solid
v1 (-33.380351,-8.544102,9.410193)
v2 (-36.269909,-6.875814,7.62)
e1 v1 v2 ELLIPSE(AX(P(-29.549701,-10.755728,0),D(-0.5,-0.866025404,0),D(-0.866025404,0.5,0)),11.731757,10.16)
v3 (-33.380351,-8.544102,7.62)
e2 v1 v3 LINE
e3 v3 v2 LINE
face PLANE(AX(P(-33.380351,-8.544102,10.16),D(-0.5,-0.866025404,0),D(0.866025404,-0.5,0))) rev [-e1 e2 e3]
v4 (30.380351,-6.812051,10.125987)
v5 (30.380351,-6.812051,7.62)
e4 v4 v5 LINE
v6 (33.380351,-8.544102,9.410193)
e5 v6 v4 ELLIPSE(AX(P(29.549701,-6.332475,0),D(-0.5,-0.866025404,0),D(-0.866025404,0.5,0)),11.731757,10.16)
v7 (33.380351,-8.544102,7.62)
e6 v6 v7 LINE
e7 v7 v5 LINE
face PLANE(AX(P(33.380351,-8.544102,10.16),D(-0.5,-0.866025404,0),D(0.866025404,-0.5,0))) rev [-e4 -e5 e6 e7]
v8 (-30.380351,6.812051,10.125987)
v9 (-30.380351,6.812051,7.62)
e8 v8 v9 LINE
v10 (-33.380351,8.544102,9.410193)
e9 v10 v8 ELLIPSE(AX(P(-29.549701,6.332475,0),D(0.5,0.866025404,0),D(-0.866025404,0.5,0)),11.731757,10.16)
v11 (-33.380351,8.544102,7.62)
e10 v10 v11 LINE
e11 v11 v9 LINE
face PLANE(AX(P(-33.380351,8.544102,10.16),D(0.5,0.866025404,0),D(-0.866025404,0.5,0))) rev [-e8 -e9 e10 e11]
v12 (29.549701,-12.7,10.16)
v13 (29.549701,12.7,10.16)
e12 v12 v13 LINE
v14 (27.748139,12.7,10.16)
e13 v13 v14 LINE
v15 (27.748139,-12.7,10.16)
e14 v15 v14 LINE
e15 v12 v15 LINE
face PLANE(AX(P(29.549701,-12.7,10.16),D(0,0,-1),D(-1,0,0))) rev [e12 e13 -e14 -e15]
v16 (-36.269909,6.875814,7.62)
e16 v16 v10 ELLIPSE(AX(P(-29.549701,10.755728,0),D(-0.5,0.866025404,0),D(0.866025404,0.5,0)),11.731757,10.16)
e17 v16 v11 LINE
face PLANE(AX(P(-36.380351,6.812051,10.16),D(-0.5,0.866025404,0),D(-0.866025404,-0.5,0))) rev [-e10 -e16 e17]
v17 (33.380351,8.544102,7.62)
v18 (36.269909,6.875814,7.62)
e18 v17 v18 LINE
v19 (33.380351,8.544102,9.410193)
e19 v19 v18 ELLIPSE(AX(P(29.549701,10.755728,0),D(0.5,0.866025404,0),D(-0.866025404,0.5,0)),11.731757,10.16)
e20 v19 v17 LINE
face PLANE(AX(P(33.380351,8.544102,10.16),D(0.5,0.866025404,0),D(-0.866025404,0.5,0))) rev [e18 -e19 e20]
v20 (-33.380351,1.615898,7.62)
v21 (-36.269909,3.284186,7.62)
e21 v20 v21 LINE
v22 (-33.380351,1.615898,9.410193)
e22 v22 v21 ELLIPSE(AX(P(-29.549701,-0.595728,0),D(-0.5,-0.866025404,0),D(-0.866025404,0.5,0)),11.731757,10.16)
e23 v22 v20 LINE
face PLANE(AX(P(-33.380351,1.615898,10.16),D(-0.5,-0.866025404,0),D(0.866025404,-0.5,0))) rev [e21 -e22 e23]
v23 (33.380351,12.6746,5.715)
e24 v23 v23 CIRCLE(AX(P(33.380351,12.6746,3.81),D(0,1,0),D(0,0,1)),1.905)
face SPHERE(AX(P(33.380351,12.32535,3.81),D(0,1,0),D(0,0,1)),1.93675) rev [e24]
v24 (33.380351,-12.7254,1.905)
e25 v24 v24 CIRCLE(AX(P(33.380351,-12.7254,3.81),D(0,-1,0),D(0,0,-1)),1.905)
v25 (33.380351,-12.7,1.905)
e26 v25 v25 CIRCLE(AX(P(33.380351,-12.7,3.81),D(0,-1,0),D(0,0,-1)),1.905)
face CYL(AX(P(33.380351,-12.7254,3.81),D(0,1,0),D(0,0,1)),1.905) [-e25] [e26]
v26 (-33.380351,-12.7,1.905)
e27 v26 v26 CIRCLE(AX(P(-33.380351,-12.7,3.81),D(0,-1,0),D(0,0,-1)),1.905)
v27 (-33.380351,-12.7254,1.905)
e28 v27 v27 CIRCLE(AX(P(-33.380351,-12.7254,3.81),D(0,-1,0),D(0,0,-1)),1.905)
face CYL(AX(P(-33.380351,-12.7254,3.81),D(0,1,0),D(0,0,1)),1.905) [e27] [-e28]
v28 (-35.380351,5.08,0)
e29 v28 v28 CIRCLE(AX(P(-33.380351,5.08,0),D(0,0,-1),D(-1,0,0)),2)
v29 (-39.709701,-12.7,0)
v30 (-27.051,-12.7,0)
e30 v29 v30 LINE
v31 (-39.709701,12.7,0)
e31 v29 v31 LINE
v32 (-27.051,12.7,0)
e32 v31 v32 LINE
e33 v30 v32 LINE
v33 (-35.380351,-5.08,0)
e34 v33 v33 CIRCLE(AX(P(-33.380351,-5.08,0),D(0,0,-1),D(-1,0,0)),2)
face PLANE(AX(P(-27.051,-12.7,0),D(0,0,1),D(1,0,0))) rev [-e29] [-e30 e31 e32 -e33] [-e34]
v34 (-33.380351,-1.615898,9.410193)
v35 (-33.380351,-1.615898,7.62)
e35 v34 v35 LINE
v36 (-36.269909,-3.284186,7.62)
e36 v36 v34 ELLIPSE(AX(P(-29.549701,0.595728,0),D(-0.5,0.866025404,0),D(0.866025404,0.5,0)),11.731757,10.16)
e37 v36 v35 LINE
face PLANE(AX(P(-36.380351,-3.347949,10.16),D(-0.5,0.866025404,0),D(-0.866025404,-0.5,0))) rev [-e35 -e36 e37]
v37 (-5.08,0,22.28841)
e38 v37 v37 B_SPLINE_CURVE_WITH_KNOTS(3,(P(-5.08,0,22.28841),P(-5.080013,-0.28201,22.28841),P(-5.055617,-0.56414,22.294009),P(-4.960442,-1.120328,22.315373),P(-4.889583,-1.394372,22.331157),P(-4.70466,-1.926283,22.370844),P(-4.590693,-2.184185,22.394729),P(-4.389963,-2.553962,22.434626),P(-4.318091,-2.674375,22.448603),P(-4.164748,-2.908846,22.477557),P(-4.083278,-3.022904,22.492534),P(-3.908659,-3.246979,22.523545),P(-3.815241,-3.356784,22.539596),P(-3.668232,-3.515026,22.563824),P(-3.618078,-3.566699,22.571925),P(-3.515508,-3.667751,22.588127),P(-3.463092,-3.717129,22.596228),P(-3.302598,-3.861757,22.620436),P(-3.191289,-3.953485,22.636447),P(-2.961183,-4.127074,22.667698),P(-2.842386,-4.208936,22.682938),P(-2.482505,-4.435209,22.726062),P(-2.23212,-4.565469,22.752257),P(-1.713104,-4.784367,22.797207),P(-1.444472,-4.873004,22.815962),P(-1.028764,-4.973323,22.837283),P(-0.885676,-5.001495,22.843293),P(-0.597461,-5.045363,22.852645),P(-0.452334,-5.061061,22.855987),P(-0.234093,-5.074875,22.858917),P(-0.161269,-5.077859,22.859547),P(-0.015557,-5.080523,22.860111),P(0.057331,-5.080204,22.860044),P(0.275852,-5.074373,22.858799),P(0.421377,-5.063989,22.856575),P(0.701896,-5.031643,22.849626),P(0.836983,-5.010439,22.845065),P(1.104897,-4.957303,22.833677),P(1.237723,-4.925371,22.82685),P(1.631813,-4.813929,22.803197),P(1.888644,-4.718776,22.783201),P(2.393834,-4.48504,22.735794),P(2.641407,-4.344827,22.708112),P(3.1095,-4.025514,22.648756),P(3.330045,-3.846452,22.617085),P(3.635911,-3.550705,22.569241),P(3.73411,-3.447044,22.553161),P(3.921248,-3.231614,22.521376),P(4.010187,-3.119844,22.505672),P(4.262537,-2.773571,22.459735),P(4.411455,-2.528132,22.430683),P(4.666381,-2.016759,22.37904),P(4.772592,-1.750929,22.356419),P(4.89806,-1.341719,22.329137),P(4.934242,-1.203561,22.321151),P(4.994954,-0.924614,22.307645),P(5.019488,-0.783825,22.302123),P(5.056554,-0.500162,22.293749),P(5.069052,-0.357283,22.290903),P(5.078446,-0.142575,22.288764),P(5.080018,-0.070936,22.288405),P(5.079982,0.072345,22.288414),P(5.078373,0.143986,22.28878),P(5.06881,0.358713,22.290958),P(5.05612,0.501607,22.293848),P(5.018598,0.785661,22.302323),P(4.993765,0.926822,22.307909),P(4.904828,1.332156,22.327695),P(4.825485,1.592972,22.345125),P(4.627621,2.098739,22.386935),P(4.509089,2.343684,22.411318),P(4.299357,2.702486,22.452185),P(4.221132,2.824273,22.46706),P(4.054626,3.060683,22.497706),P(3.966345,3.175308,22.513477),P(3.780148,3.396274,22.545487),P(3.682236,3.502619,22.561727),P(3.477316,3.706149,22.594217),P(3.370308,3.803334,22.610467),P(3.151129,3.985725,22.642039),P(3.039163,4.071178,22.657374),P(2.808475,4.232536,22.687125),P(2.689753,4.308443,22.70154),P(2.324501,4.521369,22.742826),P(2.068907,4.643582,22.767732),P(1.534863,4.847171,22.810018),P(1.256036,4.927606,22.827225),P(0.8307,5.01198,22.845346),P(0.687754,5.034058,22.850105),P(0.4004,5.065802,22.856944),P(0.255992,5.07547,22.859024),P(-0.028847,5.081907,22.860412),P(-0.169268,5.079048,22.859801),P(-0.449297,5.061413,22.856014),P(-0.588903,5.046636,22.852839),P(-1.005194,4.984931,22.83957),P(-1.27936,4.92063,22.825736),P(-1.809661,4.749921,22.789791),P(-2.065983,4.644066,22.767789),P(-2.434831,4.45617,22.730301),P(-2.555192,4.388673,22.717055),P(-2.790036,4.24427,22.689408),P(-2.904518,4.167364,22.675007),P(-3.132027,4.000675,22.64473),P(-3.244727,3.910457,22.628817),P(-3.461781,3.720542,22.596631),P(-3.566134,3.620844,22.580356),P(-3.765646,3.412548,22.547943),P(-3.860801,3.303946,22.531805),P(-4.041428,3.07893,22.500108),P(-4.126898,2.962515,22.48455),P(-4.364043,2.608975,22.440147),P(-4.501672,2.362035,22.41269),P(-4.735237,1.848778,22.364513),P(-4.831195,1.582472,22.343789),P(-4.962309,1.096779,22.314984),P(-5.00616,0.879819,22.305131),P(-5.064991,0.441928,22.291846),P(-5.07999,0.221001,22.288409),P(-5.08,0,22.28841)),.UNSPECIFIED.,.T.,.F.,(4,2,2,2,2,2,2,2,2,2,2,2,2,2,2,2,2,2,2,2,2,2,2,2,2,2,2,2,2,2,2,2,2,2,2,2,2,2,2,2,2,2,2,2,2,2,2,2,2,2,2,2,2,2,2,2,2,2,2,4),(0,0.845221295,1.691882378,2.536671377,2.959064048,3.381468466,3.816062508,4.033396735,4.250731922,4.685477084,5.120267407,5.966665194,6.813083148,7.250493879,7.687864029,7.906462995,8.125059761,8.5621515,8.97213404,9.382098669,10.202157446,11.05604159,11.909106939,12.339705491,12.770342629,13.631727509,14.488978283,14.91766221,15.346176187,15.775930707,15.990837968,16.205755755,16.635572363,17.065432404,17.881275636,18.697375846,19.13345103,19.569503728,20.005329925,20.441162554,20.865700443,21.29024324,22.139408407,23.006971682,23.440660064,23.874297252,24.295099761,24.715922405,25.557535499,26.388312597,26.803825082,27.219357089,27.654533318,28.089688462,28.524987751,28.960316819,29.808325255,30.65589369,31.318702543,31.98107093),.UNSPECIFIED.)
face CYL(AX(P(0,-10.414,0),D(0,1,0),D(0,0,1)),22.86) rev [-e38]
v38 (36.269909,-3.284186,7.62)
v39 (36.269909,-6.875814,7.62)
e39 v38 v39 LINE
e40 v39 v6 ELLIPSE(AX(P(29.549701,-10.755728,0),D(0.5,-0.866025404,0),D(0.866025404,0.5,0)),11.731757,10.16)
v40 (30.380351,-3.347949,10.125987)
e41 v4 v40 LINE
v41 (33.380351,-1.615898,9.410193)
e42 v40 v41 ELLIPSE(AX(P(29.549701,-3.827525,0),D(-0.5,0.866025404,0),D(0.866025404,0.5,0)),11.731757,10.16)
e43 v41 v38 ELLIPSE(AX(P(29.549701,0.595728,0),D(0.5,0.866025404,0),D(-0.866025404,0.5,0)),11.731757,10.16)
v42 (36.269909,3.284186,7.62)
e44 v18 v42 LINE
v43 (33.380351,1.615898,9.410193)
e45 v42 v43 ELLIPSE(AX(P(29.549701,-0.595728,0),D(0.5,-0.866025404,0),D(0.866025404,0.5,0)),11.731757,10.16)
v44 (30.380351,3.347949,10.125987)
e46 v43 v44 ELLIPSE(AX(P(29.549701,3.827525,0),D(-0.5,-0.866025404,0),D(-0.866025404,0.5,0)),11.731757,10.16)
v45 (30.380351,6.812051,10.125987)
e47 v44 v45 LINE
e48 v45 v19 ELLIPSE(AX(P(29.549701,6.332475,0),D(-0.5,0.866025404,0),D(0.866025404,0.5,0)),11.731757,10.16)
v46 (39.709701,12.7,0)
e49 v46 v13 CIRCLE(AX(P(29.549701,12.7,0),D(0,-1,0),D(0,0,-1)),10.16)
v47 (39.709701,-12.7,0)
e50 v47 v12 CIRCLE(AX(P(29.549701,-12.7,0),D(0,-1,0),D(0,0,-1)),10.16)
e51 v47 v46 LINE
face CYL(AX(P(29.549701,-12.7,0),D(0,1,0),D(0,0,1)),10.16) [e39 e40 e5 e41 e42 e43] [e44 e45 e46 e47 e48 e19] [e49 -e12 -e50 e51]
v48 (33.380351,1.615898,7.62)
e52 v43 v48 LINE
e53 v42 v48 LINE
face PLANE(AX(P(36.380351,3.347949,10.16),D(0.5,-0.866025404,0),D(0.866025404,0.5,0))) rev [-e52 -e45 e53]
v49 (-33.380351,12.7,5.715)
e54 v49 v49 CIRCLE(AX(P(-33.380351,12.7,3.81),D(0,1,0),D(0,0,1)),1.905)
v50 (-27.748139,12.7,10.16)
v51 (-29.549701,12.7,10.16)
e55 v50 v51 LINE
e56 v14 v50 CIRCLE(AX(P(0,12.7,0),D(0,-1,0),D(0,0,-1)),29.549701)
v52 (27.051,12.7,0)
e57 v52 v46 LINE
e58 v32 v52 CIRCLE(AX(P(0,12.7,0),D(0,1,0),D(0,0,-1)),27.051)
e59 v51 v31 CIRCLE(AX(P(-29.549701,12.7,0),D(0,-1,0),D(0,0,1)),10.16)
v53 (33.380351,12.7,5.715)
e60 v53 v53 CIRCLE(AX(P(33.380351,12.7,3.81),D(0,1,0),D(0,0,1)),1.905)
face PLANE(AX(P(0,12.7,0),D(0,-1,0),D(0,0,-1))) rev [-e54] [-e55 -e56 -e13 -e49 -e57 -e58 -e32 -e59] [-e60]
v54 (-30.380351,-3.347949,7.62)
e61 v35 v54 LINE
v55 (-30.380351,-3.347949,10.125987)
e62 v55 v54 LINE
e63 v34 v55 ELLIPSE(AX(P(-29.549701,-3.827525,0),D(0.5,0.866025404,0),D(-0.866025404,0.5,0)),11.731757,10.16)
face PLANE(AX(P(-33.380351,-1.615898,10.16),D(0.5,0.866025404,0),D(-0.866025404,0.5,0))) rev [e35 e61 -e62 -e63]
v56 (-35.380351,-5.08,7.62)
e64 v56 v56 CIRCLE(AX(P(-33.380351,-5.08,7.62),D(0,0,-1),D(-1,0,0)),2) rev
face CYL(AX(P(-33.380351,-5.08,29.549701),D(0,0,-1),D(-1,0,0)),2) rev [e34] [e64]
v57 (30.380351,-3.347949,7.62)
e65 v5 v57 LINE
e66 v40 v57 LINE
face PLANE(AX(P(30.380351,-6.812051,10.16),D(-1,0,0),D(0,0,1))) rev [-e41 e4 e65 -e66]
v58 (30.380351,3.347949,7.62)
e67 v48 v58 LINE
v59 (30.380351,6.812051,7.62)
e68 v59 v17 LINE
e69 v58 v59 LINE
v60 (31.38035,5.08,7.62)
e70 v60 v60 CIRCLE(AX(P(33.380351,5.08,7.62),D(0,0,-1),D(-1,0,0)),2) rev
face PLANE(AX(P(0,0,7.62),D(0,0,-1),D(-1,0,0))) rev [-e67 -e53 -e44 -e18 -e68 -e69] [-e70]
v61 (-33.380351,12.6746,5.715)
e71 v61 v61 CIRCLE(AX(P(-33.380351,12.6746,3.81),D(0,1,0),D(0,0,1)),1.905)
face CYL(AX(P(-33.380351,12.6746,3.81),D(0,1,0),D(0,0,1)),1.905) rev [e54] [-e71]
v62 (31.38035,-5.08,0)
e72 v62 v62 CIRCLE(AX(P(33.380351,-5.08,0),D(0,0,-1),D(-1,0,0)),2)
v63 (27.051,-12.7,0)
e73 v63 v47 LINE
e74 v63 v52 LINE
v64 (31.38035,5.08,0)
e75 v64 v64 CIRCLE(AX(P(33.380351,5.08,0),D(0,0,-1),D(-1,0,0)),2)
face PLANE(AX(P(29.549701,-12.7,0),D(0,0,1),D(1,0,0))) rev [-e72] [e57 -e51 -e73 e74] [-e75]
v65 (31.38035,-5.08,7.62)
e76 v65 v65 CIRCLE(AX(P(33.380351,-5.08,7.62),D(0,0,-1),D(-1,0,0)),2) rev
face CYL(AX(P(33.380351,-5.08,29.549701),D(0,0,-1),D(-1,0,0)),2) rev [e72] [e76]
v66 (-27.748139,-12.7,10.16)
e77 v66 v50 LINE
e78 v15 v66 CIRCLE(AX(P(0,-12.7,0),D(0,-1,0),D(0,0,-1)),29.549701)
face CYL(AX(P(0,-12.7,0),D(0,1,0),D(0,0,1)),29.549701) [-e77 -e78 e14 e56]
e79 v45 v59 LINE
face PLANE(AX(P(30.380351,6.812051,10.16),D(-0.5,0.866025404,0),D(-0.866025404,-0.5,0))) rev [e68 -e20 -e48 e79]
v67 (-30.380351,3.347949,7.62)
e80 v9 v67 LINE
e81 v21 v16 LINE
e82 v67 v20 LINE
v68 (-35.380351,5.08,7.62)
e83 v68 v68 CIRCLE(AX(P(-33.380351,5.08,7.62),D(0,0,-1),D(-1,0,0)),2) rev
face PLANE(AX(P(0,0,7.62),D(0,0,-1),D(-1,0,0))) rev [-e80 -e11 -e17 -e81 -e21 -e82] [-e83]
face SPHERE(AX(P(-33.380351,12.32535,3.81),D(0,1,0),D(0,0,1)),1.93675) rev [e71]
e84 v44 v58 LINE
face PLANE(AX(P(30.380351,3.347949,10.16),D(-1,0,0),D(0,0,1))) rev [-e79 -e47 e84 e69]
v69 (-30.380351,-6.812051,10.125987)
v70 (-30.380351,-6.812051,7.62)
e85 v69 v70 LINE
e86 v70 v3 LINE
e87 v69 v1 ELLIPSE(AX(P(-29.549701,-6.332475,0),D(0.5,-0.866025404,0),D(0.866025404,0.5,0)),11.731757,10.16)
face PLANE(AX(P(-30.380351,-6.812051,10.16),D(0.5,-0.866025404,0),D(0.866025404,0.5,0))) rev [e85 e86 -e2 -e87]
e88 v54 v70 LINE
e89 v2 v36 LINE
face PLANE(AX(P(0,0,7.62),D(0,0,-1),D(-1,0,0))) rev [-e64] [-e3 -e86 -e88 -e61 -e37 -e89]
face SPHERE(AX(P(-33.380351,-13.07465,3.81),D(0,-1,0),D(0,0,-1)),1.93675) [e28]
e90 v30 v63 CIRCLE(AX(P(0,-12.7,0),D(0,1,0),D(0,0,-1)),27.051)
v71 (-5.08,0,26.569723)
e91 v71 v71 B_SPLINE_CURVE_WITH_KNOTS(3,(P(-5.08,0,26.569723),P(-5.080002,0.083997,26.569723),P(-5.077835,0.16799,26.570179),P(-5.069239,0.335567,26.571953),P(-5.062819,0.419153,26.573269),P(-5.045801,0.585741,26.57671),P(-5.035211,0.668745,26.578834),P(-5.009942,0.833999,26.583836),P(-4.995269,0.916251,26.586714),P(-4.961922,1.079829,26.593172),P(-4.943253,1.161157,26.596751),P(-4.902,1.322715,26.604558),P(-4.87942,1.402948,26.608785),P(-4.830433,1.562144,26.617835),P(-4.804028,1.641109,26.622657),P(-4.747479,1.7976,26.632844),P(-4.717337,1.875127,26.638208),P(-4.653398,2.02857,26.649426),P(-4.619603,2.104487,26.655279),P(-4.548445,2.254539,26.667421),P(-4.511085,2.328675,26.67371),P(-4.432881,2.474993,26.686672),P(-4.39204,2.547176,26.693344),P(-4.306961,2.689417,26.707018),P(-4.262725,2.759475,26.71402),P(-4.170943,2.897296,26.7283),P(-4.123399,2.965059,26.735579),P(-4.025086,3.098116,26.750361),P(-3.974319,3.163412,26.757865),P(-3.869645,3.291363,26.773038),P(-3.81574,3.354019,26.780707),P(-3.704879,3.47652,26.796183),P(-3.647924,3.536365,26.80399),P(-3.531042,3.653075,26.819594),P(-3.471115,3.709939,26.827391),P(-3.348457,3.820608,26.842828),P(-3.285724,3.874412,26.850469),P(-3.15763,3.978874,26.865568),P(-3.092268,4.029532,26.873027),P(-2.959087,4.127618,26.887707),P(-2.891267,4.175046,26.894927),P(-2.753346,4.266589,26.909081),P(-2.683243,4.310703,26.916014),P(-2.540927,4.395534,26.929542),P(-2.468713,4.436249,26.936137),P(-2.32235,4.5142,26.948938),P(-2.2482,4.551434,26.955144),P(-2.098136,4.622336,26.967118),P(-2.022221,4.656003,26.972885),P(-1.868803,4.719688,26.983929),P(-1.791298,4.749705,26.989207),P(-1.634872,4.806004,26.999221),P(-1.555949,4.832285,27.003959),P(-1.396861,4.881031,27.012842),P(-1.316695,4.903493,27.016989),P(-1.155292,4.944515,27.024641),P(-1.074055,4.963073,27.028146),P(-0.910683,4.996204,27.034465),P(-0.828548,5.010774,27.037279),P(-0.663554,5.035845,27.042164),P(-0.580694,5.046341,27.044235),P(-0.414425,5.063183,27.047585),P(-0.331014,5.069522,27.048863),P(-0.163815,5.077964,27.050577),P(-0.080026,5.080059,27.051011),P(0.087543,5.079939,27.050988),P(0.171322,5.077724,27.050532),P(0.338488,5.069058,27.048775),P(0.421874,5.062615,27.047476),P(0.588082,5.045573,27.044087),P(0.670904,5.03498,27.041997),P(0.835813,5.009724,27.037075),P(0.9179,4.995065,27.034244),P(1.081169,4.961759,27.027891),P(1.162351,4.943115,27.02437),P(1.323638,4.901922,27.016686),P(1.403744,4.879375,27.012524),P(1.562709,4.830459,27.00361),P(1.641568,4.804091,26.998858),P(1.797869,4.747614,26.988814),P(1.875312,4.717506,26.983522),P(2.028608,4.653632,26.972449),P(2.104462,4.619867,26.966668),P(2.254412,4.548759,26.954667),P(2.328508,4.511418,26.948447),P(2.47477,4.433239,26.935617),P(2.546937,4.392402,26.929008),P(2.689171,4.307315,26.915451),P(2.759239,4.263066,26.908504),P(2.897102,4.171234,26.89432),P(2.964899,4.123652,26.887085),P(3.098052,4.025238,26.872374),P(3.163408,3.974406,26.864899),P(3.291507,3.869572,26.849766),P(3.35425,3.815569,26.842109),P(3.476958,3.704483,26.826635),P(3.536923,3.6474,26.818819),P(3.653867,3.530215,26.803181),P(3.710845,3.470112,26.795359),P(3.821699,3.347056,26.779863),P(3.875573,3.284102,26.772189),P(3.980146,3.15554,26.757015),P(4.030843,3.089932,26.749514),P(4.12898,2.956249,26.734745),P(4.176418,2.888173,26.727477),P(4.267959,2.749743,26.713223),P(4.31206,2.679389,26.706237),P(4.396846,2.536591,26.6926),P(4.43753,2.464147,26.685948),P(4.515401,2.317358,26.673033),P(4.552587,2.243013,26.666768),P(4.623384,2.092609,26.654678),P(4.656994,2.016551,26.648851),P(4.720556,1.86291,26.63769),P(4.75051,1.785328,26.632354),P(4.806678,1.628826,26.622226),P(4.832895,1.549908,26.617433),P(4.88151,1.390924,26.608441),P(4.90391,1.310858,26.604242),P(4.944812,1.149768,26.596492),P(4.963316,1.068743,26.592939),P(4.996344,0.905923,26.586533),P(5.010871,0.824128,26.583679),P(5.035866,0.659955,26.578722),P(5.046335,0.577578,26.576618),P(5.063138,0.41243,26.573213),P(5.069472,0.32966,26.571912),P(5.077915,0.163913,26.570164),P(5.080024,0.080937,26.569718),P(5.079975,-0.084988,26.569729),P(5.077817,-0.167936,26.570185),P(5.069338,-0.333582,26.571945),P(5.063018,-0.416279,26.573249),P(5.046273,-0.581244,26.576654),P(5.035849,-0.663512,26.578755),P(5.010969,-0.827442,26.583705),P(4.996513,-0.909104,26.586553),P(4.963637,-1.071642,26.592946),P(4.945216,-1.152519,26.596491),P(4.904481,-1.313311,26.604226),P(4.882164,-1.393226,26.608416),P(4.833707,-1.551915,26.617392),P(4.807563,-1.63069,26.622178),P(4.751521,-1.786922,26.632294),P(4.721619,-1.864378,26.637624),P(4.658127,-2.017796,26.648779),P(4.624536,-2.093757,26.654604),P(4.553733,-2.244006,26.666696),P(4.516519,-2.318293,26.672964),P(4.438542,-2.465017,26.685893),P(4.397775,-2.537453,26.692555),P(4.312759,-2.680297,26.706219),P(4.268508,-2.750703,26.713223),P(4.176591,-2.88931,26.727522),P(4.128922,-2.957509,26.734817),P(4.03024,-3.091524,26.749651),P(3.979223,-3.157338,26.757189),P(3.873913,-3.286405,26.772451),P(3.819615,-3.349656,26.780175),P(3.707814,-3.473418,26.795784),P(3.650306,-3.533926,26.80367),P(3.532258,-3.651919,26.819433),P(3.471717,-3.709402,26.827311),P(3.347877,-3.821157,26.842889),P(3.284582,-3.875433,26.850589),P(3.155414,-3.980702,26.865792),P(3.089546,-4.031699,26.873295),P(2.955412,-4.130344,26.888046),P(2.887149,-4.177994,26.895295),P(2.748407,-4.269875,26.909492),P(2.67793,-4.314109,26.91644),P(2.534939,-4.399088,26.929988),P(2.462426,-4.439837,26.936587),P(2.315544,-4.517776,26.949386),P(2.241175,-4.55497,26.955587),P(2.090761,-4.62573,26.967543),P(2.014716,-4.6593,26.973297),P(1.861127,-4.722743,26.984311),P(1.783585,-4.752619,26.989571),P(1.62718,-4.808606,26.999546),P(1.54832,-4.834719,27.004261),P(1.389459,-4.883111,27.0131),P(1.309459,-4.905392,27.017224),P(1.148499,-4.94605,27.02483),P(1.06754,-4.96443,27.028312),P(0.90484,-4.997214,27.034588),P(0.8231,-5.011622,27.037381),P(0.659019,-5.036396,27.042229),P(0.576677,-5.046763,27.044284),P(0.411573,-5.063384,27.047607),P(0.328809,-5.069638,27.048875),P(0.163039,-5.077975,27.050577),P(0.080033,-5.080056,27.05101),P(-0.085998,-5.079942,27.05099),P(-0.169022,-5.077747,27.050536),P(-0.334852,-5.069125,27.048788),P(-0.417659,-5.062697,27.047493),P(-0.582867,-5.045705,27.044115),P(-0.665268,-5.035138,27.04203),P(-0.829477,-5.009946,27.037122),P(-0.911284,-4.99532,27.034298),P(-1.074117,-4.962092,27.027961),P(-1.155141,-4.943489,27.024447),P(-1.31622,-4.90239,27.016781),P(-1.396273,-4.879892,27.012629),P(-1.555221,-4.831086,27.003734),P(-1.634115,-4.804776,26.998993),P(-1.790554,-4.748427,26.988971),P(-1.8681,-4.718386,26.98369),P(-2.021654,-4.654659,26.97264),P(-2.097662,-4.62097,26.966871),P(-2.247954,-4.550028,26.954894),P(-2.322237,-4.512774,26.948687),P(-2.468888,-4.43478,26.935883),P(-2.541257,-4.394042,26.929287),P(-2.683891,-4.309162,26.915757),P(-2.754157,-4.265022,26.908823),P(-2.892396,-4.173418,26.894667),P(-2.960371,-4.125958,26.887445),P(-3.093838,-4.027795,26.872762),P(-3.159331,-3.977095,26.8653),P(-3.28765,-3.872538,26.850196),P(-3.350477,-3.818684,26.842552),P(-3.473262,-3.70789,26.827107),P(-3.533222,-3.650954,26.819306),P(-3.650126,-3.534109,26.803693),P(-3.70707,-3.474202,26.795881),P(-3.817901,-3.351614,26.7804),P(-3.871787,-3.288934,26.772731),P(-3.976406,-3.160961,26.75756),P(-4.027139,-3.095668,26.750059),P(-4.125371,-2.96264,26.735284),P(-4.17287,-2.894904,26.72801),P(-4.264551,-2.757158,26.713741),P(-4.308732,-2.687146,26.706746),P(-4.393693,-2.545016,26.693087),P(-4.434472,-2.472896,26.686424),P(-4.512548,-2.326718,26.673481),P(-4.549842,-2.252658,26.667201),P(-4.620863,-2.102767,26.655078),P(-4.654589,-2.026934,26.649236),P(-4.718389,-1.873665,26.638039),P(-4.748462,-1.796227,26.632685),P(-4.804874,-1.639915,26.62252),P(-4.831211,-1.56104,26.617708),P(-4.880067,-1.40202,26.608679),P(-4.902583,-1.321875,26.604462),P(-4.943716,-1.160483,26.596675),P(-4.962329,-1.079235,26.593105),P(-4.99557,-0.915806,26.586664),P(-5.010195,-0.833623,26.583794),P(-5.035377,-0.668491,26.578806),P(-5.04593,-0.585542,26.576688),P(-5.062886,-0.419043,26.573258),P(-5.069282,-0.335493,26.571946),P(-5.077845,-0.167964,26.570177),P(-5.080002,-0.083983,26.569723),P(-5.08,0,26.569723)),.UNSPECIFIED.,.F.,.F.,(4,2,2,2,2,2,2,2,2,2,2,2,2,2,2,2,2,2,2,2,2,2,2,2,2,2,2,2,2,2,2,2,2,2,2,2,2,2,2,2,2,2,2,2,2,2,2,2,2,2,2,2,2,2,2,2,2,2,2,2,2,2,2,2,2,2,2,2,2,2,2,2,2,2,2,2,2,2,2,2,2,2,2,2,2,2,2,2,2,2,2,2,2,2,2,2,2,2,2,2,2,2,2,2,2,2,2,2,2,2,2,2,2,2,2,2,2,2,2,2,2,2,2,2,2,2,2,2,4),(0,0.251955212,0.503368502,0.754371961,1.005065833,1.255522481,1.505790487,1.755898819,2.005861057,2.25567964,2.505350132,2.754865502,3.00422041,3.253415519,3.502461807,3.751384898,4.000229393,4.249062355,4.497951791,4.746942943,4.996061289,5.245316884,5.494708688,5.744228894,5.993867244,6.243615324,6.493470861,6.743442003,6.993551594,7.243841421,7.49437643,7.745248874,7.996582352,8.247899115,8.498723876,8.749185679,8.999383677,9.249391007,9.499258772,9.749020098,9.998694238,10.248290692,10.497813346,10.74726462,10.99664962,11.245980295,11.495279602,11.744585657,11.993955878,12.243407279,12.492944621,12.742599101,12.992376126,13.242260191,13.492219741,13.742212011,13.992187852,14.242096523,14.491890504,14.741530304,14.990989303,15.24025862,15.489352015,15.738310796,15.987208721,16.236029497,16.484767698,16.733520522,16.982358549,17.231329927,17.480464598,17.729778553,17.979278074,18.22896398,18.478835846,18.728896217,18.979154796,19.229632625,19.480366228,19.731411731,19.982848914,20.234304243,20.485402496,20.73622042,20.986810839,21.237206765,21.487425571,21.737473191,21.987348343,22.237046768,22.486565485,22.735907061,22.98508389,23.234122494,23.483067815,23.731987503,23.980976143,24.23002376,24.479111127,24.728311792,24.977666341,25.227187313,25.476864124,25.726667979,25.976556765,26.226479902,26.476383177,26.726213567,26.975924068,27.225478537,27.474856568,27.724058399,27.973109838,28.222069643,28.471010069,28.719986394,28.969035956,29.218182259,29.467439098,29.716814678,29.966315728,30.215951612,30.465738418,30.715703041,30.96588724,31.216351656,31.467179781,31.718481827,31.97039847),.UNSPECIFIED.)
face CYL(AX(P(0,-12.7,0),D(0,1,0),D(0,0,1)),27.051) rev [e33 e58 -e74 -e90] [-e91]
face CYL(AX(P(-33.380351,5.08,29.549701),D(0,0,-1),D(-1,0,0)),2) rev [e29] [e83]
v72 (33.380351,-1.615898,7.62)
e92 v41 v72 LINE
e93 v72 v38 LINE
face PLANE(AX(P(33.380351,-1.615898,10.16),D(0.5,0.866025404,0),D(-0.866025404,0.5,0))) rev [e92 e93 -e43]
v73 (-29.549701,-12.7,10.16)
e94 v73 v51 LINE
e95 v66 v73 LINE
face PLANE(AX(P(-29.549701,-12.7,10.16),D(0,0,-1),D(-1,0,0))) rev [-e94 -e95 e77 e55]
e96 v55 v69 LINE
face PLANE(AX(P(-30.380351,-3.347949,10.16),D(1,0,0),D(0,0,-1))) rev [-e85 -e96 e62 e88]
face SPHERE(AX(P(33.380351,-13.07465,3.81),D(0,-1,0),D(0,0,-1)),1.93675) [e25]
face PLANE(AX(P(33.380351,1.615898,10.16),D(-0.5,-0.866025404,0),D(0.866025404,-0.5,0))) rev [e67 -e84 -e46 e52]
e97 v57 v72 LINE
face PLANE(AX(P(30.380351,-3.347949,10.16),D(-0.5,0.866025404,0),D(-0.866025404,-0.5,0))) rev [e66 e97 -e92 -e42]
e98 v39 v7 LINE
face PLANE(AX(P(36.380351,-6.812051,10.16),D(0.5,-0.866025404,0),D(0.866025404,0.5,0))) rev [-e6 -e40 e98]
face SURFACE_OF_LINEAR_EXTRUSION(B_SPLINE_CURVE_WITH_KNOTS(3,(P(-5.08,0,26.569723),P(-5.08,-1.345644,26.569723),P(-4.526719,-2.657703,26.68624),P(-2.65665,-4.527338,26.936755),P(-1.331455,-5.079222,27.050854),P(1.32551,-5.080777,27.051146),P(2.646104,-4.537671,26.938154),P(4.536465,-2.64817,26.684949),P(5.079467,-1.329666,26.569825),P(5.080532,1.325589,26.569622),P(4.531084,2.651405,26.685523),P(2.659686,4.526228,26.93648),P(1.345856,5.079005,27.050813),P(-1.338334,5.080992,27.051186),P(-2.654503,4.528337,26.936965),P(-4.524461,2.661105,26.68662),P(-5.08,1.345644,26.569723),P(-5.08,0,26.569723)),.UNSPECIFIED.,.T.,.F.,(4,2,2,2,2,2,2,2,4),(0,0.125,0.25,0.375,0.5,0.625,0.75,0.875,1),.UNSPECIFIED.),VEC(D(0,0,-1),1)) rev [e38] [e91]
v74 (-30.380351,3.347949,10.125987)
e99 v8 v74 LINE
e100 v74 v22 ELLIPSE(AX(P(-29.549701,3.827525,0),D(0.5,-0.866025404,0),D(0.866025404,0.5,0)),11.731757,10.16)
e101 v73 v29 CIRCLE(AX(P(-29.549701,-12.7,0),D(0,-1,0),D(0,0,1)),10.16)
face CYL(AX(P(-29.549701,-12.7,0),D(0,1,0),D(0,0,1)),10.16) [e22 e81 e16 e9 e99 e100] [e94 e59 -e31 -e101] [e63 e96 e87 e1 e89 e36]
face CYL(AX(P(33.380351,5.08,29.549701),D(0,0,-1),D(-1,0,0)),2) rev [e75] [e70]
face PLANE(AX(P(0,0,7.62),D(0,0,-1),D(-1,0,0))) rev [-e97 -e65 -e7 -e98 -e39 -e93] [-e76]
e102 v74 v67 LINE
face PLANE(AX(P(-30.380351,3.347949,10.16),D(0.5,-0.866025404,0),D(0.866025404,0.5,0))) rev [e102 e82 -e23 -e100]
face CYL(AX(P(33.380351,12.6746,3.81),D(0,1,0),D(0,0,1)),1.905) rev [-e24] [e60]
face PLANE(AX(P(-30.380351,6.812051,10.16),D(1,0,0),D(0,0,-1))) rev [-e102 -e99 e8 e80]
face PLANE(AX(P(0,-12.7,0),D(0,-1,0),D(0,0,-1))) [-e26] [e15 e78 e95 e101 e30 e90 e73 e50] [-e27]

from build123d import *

# Parameters (mm, degrees)
BOSS_EXTRUDE5_DEPTH      = 12.7
BOSS_EXTRUDE5_DEPTH_BACK = 12.7
SKETCH6_R                = 2.000000064
CUT_EXTRUDE4_DEPTH       = 52.101224931
CUT_EXTRUDE5_START       = -7.62
CUT_EXTRUDE5_DEPTH       = 2.54
SKETCH9_R                = 1.905
BOSS_EXTRUDE9_DEPTH      = 0.0254
DOME3_FACE_RADIUS        = 1.905
DOME3_HEIGHT             = 2.286
DOME4_FACE_RADIUS        = 1.905
DOME4_HEIGHT             = 2.286
SKETCH10_R               = 1.905
CUT_EXTRUDE6_DEPTH       = 0.0254
DOME5_FACE_RADIUS        = 1.905
DOME5_HEIGHT             = 2.286
DOME6_FACE_RADIUS        = 1.905
DOME6_HEIGHT             = 2.286
BOSS_EXTRUDE10_START     = -28
BOSS_EXTRUDE10_DEPTH     = 9.812276711
BOSS_EXTRUDE10_START_2   = -6
BOSS_EXTRUDE10_2_DEPTH   = 12
CUT_EXTRUDE7_DEPTH       = 10.414
CUT_EXTRUDE7_DEPTH_BACK  = 10.414
SKETCH13_R               = 22.86


with BuildPart() as part:
    # Sketch3 → Boss-Extrude5 (new, two sides: drawn at the far end of the back side and taken through both)
    with BuildSketch(Plane(origin=(0, 0, 0), x_dir=(-1, 0, 0), z_dir=(0, -1, 0)).offset(-BOSS_EXTRUDE5_DEPTH_BACK)):
        with BuildLine():
            Line((27.051, 0), (29.549701049, 0))
            Line((29.549701049, 0), (39.709701049, 0))
            ThreePointArc((39.709701049, 0), (36.733905946, -7.184204897), (29.549701049, -10.16))
            Line((29.549701049, -10.16), (27.748139255, -10.16))
            ThreePointArc((27.748139255, -10.16), (0, -29.549701049), (-27.748139255, -10.16))
            Line((-27.748139255, -10.16), (-29.549701049, -10.16))
            ThreePointArc((-29.549701049, -10.16), (-36.733905946, -7.184204897), (-39.709701049, 0))
            Line((-39.709701049, 0), (-29.549701049, 0))
            Line((-29.549701049, 0), (-27.051, 0))
            ThreePointArc((-27.051, 0), (0, -27.051), (27.051, 0))
        make_face()
    extrude(amount=BOSS_EXTRUDE5_DEPTH + BOSS_EXTRUDE5_DEPTH_BACK)

    # Sketch6 → Cut-Extrude4 (cut, through all)
    with BuildSketch(Plane(origin=(0, 0, 0), x_dir=(-1, 0, 0), z_dir=(0, 0, -1))):
        with Locations((-33.380350525, 5.08)):
            Circle(SKETCH6_R)
        with Locations((-33.380350525, -5.08)):
            Circle(SKETCH6_R)
        with Locations((33.380350525, 5.08)):
            Circle(SKETCH6_R)
        with Locations((33.380350525, -5.08)):
            Circle(SKETCH6_R)
    extrude(amount=-CUT_EXTRUDE4_DEPTH, mode=Mode.SUBTRACT)

    # Sketch7 → Cut-Extrude5 (cut)
    with BuildSketch(Plane(origin=(0, 0, 0), x_dir=(-1, 0, 0), z_dir=(0, 0, -1)).offset(CUT_EXTRUDE5_START)):
        Polygon((-30.380350525, 6.812050808), (-33.380350525, 8.544101615), (-36.380350525, 6.812050808), (-36.380350525, 3.347949192), (-33.380350525, 1.615898385), (-30.380350525, 3.347949192), align=None)
        Polygon((-30.380350525, -3.347949192), (-33.380350525, -1.615898385), (-36.380350525, -3.347949192), (-36.380350525, -6.812050808), (-33.380350525, -8.544101615), (-30.380350525, -6.812050808), align=None)
        Polygon((36.380350525, 6.812050808), (33.380350525, 8.544101615), (30.380350525, 6.812050808), (30.380350525, 3.347949192), (33.380350525, 1.615898385), (36.380350525, 3.347949192), align=None)
        Polygon((36.380350525, -3.347949192), (33.380350525, -1.615898385), (30.380350525, -3.347949192), (30.380350525, -6.812050808), (33.380350525, -8.544101615), (36.380350525, -6.812050808), align=None)
    extrude(amount=-CUT_EXTRUDE5_DEPTH, mode=Mode.SUBTRACT)

    # Sketch9 → Boss-Extrude9 (add)
    with BuildSketch(Plane(origin=(0, -12.7, 0), x_dir=(-1, 0, 0), z_dir=(0, -1, 0))):
        with Locations(Location((-33.380350525, -3.81, 0), (0, 0, 90))):
            Circle(SKETCH9_R)
        with Locations(Location((33.380350525, -3.81, 0), (0, 0, 90))):
            Circle(SKETCH9_R)
    extrude(amount=BOSS_EXTRUDE9_DEPTH)

    # Dome3: a dome of height H over a round flat face of radius A is a cap of a sphere of radius (A * A + H * H) / (2 * H)
    dome3_r = (DOME3_FACE_RADIUS * DOME3_FACE_RADIUS + DOME3_HEIGHT * DOME3_HEIGHT) / (2 * DOME3_HEIGHT)
    dome3_base = Plane((33.380350525, -12.7254, 3.81), z_dir=(0, -1, 0))
    with Locations(dome3_base.offset(DOME3_HEIGHT - dome3_r)):
        dome3_ball = Sphere(dome3_r, mode=Mode.PRIVATE)
    add(split(dome3_ball, bisect_by=dome3_base, keep=Keep.TOP, mode=Mode.PRIVATE))

    # Dome4: a dome of height H over a round flat face of radius A is a cap of a sphere of radius (A * A + H * H) / (2 * H)
    dome4_r = (DOME4_FACE_RADIUS * DOME4_FACE_RADIUS + DOME4_HEIGHT * DOME4_HEIGHT) / (2 * DOME4_HEIGHT)
    dome4_base = Plane((-33.380350525, -12.7254, 3.81), z_dir=(0, -1, 0))
    with Locations(dome4_base.offset(DOME4_HEIGHT - dome4_r)):
        dome4_ball = Sphere(dome4_r, mode=Mode.PRIVATE)
    add(split(dome4_ball, bisect_by=dome4_base, keep=Keep.TOP, mode=Mode.PRIVATE))

    # Sketch10 → Cut-Extrude6 (cut)
    with BuildSketch(Plane(origin=(0, 12.7, 0), x_dir=(1, 0, 0), z_dir=(0, 1, 0))):
        with Locations(Location((33.380350525, -3.81, 0), (0, 0, 90))):
            Circle(SKETCH10_R)
        with Locations(Location((-33.380350525, -3.81, 0), (0, 0, 90))):
            Circle(SKETCH10_R)
    extrude(amount=-CUT_EXTRUDE6_DEPTH, mode=Mode.SUBTRACT)

    # Dome5: a dome of height H over a round flat face of radius A is a cap of a sphere of radius (A * A + H * H) / (2 * H)
    dome5_r = (DOME5_FACE_RADIUS * DOME5_FACE_RADIUS + DOME5_HEIGHT * DOME5_HEIGHT) / (2 * DOME5_HEIGHT)
    dome5_base = Plane((33.380350525, 12.6746, 3.81), z_dir=(0, -1, 0))
    with Locations(dome5_base.offset(DOME5_HEIGHT - dome5_r)):
        dome5_ball = Sphere(dome5_r, mode=Mode.PRIVATE)
    add(split(dome5_ball, bisect_by=dome5_base, keep=Keep.TOP, mode=Mode.PRIVATE), mode=Mode.SUBTRACT)

    # Dome6: a dome of height H over a round flat face of radius A is a cap of a sphere of radius (A * A + H * H) / (2 * H)
    dome6_r = (DOME6_FACE_RADIUS * DOME6_FACE_RADIUS + DOME6_HEIGHT * DOME6_HEIGHT) / (2 * DOME6_HEIGHT)
    dome6_base = Plane((-33.380350525, 12.6746, 3.81), z_dir=(0, -1, 0))
    with Locations(dome6_base.offset(DOME6_HEIGHT - dome6_r)):
        dome6_ball = Sphere(dome6_r, mode=Mode.PRIVATE)
    add(split(dome6_ball, bisect_by=dome6_base, keep=Keep.TOP, mode=Mode.PRIVATE), mode=Mode.SUBTRACT)

    # Boss-Extrude10: read off the stored shape, not the designer's step
    # Boss-Extrude10 outline → Boss-Extrude10 (add)
    with BuildSketch(Plane(origin=(0, 0, 0), x_dir=(-1, 0, 0), z_dir=(0, 0, -1)).offset(BOSS_EXTRUDE10_START)):
        with BuildLine():
            add(Edge.make_bspline(
                [(5.08, 0), (5.08, -1.345643562), (4.526719274, -2.65770318), (2.656649507, -4.527337736), (1.331455476, -5.079221738), (-1.32551012, -5.080776522), (-2.646103693, -4.537670622), (-4.536464951, -2.648170155), (-5.07946682, -1.329666265), (-5.080532362, 1.325589104), (-4.531084206, 2.651405113), (-2.659686169, 4.526228301), (-1.345855952, 5.079004988), (1.338333997, 5.080992228), (2.654502959, 4.528337308), (4.524460769, 2.661104937), (5.08, 1.345643562), (5.08, 0)],
                knots=[0, 0, 0, 0, 0.125, 0.125, 0.25, 0.25, 0.375, 0.375, 0.5, 0.5, 0.625, 0.625, 0.75, 0.75, 0.875, 0.875, 1, 1, 1, 1], degree=3))
        make_face()
    extrude(amount=BOSS_EXTRUDE10_DEPTH)

    # Boss-Extrude10 2 outline → Boss-Extrude10 2 (cut)
    with BuildSketch(Plane(origin=(0, 0, 0), x_dir=(1, 0, 0), z_dir=(0, 1, 0)).offset(BOSS_EXTRUDE10_START_2)):
        with BuildLine():
            Line((5.080000094, -18.187723372), (-5.080000481, -18.187723298))
            ThreePointArc((-5.080000481, -18.187723298), (-1.97e-07, -18.669), (5.080000094, -18.187723372))
        make_face()
    extrude(amount=BOSS_EXTRUDE10_2_DEPTH, mode=Mode.SUBTRACT)

    # Sketch13 → Cut-Extrude7 (cut, two sides: drawn at the far end of the back side and taken through both)
    with BuildSketch(Plane(origin=(0, 0, 0), x_dir=(1, 0, 0), z_dir=(0, 1, 0)).offset(-CUT_EXTRUDE7_DEPTH_BACK)):
        Circle(SKETCH13_R)
    extrude(amount=CUT_EXTRUDE7_DEPTH + CUT_EXTRUDE7_DEPTH_BACK, mode=Mode.SUBTRACT)


solid = part.part
